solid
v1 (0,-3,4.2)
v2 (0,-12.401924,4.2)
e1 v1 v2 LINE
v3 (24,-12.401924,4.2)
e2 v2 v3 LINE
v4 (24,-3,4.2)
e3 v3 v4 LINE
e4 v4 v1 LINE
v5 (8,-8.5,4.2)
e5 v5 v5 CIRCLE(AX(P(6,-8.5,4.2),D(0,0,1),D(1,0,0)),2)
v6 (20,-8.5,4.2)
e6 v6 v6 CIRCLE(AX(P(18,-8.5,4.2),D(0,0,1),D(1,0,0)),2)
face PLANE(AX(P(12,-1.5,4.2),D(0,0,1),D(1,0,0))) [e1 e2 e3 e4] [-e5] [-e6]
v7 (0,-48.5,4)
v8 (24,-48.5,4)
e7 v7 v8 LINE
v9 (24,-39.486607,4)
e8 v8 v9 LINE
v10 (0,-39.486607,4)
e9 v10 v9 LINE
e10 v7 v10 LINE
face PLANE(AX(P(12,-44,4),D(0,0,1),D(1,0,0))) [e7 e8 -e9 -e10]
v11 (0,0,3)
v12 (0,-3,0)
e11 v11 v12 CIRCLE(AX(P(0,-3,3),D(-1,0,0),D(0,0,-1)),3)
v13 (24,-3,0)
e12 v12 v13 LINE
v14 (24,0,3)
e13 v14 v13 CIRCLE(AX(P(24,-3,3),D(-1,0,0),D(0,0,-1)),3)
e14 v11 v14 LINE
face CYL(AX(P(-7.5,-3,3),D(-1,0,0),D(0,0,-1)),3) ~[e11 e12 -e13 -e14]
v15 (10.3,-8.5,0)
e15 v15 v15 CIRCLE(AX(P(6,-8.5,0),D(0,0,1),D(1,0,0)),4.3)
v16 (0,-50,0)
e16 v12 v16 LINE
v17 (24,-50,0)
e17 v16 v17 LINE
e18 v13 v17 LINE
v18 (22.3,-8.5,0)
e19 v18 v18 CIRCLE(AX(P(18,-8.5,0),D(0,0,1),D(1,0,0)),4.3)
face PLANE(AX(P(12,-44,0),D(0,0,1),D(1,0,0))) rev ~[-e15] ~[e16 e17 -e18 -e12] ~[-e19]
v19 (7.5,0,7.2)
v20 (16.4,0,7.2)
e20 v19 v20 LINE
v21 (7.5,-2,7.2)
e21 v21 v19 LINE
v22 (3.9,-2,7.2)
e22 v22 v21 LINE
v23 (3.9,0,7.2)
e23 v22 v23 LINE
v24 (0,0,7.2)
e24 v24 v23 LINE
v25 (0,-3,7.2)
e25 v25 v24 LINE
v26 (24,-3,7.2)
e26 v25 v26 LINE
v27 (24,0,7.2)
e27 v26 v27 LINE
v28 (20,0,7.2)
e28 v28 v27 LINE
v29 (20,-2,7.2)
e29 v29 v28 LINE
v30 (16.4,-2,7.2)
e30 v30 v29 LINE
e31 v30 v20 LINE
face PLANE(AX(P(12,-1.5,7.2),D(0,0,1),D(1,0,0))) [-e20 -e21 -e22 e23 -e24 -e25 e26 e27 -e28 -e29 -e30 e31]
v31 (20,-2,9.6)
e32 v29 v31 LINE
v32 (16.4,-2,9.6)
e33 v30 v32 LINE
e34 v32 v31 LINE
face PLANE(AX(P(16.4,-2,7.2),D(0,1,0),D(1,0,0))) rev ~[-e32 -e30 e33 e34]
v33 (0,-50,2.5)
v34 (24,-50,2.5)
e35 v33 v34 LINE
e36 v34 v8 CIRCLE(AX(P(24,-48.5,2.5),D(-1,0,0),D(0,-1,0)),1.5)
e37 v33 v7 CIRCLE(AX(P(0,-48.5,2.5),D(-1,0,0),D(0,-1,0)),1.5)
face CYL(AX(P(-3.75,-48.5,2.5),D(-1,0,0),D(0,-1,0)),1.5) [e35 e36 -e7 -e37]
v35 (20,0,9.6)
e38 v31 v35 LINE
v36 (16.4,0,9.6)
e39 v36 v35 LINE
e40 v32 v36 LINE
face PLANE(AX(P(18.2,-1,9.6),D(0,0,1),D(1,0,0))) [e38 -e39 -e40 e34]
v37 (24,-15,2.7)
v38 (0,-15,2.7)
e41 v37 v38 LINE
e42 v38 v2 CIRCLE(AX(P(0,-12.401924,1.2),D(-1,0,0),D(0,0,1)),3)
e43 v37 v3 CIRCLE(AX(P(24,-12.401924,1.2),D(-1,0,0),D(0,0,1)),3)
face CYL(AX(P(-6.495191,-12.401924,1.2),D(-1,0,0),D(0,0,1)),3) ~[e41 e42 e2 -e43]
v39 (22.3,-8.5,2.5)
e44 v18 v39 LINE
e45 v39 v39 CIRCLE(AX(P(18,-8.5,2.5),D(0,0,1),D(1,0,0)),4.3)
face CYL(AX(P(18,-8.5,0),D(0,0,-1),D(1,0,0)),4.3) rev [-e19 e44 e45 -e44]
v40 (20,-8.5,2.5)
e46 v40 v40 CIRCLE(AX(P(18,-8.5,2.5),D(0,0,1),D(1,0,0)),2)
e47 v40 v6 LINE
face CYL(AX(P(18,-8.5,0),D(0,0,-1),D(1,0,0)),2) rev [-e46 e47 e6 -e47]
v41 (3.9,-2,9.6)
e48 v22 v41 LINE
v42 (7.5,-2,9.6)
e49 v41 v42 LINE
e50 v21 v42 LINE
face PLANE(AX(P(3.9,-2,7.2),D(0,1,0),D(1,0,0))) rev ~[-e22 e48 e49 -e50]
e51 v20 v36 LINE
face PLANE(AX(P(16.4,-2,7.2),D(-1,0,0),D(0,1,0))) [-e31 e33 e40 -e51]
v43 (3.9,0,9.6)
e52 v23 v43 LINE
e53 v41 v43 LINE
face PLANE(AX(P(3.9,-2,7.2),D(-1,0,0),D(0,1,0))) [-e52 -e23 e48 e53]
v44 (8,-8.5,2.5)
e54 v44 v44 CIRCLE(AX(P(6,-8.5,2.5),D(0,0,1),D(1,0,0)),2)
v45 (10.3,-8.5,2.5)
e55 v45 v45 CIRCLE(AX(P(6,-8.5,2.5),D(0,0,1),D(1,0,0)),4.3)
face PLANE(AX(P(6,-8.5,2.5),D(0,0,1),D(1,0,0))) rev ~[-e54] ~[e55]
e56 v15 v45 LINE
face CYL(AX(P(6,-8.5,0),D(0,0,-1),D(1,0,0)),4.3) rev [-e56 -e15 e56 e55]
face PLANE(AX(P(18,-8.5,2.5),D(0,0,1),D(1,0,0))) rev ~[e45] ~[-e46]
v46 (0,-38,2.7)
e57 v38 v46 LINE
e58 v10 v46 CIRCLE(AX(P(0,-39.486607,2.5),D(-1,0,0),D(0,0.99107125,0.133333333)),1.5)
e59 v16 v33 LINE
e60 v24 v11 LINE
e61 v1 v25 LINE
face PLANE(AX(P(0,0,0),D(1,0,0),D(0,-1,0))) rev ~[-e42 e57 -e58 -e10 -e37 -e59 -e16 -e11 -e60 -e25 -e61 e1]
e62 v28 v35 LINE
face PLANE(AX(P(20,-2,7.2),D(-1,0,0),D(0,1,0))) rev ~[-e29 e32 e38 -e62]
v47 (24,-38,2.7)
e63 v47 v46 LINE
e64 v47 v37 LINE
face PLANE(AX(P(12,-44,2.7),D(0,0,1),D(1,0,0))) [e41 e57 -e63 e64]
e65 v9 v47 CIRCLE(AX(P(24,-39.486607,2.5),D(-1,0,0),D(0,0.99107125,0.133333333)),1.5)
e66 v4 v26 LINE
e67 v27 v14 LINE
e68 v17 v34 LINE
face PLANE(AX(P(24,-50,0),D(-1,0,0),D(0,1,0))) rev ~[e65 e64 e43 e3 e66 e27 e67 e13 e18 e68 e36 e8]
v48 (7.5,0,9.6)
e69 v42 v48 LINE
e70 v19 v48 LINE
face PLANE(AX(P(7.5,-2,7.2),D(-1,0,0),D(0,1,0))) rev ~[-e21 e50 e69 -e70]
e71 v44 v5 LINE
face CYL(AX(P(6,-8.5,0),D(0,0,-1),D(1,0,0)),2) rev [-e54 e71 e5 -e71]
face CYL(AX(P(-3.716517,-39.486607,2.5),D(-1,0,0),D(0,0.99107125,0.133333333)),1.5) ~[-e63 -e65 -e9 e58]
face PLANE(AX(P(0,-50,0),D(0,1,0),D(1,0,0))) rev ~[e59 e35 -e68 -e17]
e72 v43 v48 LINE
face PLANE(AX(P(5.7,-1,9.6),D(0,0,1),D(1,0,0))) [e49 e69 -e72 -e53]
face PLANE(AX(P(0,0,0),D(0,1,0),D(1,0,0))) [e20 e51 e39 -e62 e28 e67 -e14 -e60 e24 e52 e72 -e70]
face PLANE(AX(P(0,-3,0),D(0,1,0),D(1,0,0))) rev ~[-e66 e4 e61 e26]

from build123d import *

# Parameters (mm, degrees)
F0_W        = 24
F0_H        = 12
F0_H_2      = 23
F0_R        = 4.3
F0_H_3      = 3
F1_DEPTH    = 2.7
F0_R_2      = 2
F2_DEPTH    = 4.2
F3_DEPTH    = 2.5
F4_DEPTH    = 7.2
F5_W        = 3.6
F5_H        = 2
F6_DEPTH    = 2.4
F7_T1_DEPTH = 39
F7_T3_DEPTH = 36.9903810568
F8_DEPTH    = 4
F9_T1_DEPTH = 31.4330343737
F9_T3_DEPTH = 31.5


# Not quite as in the source:
# - a fillet or chamfer that OpenCascade refuses, or shapes differently, is made with other operations: its cross-section is extruded or revolved along the edge and cut away or added


with BuildPart() as f1:
    # F0 (on Top) → F1 (new body)
    with BuildSketch(Plane.XY):
        with Locations((12, -44)):
            Rectangle(F0_W, F0_H)
        with Locations((12, -26.5)):
            Rectangle(F0_W, F0_H_2)
        with Locations((12, -9)):
            Rectangle(F0_W, F0_H)
        with Locations((6, -8.5)):
            Circle(F0_R, mode=Mode.SUBTRACT)
        with Locations((18, -8.5)):
            Circle(F0_R, mode=Mode.SUBTRACT)
        with Locations((12, -1.5)):
            Rectangle(F0_W, F0_H_3)
    extrude(amount=F1_DEPTH)

    # F0 (on Top) → F2 (join)
    with BuildSketch(Plane.XY):
        with Locations((12, -1.5)):
            Rectangle(F0_W, F0_H_3)
        with Locations((12, -9)):
            Rectangle(F0_W, F0_H)
        with Locations((6, -8.5)):
            Circle(F0_R, mode=Mode.SUBTRACT)
        with Locations((18, -8.5)):
            Circle(F0_R, mode=Mode.SUBTRACT)
        with Locations((6, -8.5)):
            Circle(F0_R)
        with Locations((6, -8.5)):
            Circle(F0_R_2, mode=Mode.SUBTRACT)
        with Locations((18, -8.5)):
            Circle(F0_R)
        with Locations((18, -8.5)):
            Circle(F0_R_2, mode=Mode.SUBTRACT)
    extrude(amount=F2_DEPTH)

    # F0 (on Top) → F3 (cut)
    with BuildSketch(Plane.XY):
        with Locations((6, -8.5)):
            Circle(F0_R)
        with Locations((6, -8.5)):
            Circle(F0_R_2, mode=Mode.SUBTRACT)
        with Locations((18, -8.5)):
            Circle(F0_R)
        with Locations((18, -8.5)):
            Circle(F0_R_2, mode=Mode.SUBTRACT)
    extrude(amount=F3_DEPTH, mode=Mode.SUBTRACT)

    # F0 (on Top) → F4 (join)
    with BuildSketch(Plane.XY):
        with Locations((12, -1.5)):
            Rectangle(F0_W, F0_H_3)
    extrude(amount=F4_DEPTH)

    # F5 (on face) → F6 (join)
    with BuildSketch(Plane.XY.offset(7.2)):
        with Locations((5.7, -1)):
            Rectangle(F5_W, F5_H)
        with Locations((18.2, -1)):
            Rectangle(F5_W, F5_H)
    extrude(amount=F6_DEPTH)

    # F7: fillet of radius 3 on 2 edges, made by hand

    # F7_s2 → F7_t1 (cut)
    with BuildSketch(Plane.YZ.offset(-7.5)):
        with BuildLine():
            ThreePointArc((-3, 0), (-0.8786796564, 0.8786796564), (0, 3))
            Line((0, 3), (0, 0))
            Line((0, 0), (-3, 0))
        make_face()
    extrude(amount=F7_T1_DEPTH, mode=Mode.SUBTRACT)

    # F7_s4 → F7_t3 (cut)
    with BuildSketch(Plane.YZ.offset(-6.4951905284)):
        with BuildLine():
            ThreePointArc((-12.4019237886, 4.2), (-13.9019237886, 3.7980762114), (-15, 2.7))
            Line((-15, 2.7), (-15, 4.2))
            Line((-15, 4.2), (-12.4019237886, 4.2))
        make_face()
    extrude(amount=F7_T3_DEPTH, mode=Mode.SUBTRACT)

    # F0 (on Top) → F8 (join)
    with BuildSketch(Plane.XY):
        with Locations((12, -44)):
            Rectangle(F0_W, F0_H)
    extrude(amount=F8_DEPTH)

    # F9: fillet of radius 1.5 on 2 edges, made by hand

    # F9_s2 → F9_t1 (cut)
    with BuildSketch(Plane.YZ.offset(-3.7165171868)):
        with BuildLine():
            ThreePointArc((-38, 2.7), (-38.4991859918, 3.6291589791), (-39.4866068747, 4))
            Line((-39.4866068747, 4), (-38, 4))
            Line((-38, 4), (-38, 2.7))
        make_face()
    extrude(amount=F9_T1_DEPTH, mode=Mode.SUBTRACT)

    # F9_s4 → F9_t3 (cut)
    with BuildSketch(Plane.YZ.offset(-3.75)):
        with BuildLine():
            ThreePointArc((-50, 2.5), (-49.5606601718, 3.5606601718), (-48.5, 4))
            Line((-48.5, 4), (-50, 4))
            Line((-50, 4), (-50, 2.5))
        make_face()
    extrude(amount=F9_T3_DEPTH, mode=Mode.SUBTRACT)


solid = f1.part
